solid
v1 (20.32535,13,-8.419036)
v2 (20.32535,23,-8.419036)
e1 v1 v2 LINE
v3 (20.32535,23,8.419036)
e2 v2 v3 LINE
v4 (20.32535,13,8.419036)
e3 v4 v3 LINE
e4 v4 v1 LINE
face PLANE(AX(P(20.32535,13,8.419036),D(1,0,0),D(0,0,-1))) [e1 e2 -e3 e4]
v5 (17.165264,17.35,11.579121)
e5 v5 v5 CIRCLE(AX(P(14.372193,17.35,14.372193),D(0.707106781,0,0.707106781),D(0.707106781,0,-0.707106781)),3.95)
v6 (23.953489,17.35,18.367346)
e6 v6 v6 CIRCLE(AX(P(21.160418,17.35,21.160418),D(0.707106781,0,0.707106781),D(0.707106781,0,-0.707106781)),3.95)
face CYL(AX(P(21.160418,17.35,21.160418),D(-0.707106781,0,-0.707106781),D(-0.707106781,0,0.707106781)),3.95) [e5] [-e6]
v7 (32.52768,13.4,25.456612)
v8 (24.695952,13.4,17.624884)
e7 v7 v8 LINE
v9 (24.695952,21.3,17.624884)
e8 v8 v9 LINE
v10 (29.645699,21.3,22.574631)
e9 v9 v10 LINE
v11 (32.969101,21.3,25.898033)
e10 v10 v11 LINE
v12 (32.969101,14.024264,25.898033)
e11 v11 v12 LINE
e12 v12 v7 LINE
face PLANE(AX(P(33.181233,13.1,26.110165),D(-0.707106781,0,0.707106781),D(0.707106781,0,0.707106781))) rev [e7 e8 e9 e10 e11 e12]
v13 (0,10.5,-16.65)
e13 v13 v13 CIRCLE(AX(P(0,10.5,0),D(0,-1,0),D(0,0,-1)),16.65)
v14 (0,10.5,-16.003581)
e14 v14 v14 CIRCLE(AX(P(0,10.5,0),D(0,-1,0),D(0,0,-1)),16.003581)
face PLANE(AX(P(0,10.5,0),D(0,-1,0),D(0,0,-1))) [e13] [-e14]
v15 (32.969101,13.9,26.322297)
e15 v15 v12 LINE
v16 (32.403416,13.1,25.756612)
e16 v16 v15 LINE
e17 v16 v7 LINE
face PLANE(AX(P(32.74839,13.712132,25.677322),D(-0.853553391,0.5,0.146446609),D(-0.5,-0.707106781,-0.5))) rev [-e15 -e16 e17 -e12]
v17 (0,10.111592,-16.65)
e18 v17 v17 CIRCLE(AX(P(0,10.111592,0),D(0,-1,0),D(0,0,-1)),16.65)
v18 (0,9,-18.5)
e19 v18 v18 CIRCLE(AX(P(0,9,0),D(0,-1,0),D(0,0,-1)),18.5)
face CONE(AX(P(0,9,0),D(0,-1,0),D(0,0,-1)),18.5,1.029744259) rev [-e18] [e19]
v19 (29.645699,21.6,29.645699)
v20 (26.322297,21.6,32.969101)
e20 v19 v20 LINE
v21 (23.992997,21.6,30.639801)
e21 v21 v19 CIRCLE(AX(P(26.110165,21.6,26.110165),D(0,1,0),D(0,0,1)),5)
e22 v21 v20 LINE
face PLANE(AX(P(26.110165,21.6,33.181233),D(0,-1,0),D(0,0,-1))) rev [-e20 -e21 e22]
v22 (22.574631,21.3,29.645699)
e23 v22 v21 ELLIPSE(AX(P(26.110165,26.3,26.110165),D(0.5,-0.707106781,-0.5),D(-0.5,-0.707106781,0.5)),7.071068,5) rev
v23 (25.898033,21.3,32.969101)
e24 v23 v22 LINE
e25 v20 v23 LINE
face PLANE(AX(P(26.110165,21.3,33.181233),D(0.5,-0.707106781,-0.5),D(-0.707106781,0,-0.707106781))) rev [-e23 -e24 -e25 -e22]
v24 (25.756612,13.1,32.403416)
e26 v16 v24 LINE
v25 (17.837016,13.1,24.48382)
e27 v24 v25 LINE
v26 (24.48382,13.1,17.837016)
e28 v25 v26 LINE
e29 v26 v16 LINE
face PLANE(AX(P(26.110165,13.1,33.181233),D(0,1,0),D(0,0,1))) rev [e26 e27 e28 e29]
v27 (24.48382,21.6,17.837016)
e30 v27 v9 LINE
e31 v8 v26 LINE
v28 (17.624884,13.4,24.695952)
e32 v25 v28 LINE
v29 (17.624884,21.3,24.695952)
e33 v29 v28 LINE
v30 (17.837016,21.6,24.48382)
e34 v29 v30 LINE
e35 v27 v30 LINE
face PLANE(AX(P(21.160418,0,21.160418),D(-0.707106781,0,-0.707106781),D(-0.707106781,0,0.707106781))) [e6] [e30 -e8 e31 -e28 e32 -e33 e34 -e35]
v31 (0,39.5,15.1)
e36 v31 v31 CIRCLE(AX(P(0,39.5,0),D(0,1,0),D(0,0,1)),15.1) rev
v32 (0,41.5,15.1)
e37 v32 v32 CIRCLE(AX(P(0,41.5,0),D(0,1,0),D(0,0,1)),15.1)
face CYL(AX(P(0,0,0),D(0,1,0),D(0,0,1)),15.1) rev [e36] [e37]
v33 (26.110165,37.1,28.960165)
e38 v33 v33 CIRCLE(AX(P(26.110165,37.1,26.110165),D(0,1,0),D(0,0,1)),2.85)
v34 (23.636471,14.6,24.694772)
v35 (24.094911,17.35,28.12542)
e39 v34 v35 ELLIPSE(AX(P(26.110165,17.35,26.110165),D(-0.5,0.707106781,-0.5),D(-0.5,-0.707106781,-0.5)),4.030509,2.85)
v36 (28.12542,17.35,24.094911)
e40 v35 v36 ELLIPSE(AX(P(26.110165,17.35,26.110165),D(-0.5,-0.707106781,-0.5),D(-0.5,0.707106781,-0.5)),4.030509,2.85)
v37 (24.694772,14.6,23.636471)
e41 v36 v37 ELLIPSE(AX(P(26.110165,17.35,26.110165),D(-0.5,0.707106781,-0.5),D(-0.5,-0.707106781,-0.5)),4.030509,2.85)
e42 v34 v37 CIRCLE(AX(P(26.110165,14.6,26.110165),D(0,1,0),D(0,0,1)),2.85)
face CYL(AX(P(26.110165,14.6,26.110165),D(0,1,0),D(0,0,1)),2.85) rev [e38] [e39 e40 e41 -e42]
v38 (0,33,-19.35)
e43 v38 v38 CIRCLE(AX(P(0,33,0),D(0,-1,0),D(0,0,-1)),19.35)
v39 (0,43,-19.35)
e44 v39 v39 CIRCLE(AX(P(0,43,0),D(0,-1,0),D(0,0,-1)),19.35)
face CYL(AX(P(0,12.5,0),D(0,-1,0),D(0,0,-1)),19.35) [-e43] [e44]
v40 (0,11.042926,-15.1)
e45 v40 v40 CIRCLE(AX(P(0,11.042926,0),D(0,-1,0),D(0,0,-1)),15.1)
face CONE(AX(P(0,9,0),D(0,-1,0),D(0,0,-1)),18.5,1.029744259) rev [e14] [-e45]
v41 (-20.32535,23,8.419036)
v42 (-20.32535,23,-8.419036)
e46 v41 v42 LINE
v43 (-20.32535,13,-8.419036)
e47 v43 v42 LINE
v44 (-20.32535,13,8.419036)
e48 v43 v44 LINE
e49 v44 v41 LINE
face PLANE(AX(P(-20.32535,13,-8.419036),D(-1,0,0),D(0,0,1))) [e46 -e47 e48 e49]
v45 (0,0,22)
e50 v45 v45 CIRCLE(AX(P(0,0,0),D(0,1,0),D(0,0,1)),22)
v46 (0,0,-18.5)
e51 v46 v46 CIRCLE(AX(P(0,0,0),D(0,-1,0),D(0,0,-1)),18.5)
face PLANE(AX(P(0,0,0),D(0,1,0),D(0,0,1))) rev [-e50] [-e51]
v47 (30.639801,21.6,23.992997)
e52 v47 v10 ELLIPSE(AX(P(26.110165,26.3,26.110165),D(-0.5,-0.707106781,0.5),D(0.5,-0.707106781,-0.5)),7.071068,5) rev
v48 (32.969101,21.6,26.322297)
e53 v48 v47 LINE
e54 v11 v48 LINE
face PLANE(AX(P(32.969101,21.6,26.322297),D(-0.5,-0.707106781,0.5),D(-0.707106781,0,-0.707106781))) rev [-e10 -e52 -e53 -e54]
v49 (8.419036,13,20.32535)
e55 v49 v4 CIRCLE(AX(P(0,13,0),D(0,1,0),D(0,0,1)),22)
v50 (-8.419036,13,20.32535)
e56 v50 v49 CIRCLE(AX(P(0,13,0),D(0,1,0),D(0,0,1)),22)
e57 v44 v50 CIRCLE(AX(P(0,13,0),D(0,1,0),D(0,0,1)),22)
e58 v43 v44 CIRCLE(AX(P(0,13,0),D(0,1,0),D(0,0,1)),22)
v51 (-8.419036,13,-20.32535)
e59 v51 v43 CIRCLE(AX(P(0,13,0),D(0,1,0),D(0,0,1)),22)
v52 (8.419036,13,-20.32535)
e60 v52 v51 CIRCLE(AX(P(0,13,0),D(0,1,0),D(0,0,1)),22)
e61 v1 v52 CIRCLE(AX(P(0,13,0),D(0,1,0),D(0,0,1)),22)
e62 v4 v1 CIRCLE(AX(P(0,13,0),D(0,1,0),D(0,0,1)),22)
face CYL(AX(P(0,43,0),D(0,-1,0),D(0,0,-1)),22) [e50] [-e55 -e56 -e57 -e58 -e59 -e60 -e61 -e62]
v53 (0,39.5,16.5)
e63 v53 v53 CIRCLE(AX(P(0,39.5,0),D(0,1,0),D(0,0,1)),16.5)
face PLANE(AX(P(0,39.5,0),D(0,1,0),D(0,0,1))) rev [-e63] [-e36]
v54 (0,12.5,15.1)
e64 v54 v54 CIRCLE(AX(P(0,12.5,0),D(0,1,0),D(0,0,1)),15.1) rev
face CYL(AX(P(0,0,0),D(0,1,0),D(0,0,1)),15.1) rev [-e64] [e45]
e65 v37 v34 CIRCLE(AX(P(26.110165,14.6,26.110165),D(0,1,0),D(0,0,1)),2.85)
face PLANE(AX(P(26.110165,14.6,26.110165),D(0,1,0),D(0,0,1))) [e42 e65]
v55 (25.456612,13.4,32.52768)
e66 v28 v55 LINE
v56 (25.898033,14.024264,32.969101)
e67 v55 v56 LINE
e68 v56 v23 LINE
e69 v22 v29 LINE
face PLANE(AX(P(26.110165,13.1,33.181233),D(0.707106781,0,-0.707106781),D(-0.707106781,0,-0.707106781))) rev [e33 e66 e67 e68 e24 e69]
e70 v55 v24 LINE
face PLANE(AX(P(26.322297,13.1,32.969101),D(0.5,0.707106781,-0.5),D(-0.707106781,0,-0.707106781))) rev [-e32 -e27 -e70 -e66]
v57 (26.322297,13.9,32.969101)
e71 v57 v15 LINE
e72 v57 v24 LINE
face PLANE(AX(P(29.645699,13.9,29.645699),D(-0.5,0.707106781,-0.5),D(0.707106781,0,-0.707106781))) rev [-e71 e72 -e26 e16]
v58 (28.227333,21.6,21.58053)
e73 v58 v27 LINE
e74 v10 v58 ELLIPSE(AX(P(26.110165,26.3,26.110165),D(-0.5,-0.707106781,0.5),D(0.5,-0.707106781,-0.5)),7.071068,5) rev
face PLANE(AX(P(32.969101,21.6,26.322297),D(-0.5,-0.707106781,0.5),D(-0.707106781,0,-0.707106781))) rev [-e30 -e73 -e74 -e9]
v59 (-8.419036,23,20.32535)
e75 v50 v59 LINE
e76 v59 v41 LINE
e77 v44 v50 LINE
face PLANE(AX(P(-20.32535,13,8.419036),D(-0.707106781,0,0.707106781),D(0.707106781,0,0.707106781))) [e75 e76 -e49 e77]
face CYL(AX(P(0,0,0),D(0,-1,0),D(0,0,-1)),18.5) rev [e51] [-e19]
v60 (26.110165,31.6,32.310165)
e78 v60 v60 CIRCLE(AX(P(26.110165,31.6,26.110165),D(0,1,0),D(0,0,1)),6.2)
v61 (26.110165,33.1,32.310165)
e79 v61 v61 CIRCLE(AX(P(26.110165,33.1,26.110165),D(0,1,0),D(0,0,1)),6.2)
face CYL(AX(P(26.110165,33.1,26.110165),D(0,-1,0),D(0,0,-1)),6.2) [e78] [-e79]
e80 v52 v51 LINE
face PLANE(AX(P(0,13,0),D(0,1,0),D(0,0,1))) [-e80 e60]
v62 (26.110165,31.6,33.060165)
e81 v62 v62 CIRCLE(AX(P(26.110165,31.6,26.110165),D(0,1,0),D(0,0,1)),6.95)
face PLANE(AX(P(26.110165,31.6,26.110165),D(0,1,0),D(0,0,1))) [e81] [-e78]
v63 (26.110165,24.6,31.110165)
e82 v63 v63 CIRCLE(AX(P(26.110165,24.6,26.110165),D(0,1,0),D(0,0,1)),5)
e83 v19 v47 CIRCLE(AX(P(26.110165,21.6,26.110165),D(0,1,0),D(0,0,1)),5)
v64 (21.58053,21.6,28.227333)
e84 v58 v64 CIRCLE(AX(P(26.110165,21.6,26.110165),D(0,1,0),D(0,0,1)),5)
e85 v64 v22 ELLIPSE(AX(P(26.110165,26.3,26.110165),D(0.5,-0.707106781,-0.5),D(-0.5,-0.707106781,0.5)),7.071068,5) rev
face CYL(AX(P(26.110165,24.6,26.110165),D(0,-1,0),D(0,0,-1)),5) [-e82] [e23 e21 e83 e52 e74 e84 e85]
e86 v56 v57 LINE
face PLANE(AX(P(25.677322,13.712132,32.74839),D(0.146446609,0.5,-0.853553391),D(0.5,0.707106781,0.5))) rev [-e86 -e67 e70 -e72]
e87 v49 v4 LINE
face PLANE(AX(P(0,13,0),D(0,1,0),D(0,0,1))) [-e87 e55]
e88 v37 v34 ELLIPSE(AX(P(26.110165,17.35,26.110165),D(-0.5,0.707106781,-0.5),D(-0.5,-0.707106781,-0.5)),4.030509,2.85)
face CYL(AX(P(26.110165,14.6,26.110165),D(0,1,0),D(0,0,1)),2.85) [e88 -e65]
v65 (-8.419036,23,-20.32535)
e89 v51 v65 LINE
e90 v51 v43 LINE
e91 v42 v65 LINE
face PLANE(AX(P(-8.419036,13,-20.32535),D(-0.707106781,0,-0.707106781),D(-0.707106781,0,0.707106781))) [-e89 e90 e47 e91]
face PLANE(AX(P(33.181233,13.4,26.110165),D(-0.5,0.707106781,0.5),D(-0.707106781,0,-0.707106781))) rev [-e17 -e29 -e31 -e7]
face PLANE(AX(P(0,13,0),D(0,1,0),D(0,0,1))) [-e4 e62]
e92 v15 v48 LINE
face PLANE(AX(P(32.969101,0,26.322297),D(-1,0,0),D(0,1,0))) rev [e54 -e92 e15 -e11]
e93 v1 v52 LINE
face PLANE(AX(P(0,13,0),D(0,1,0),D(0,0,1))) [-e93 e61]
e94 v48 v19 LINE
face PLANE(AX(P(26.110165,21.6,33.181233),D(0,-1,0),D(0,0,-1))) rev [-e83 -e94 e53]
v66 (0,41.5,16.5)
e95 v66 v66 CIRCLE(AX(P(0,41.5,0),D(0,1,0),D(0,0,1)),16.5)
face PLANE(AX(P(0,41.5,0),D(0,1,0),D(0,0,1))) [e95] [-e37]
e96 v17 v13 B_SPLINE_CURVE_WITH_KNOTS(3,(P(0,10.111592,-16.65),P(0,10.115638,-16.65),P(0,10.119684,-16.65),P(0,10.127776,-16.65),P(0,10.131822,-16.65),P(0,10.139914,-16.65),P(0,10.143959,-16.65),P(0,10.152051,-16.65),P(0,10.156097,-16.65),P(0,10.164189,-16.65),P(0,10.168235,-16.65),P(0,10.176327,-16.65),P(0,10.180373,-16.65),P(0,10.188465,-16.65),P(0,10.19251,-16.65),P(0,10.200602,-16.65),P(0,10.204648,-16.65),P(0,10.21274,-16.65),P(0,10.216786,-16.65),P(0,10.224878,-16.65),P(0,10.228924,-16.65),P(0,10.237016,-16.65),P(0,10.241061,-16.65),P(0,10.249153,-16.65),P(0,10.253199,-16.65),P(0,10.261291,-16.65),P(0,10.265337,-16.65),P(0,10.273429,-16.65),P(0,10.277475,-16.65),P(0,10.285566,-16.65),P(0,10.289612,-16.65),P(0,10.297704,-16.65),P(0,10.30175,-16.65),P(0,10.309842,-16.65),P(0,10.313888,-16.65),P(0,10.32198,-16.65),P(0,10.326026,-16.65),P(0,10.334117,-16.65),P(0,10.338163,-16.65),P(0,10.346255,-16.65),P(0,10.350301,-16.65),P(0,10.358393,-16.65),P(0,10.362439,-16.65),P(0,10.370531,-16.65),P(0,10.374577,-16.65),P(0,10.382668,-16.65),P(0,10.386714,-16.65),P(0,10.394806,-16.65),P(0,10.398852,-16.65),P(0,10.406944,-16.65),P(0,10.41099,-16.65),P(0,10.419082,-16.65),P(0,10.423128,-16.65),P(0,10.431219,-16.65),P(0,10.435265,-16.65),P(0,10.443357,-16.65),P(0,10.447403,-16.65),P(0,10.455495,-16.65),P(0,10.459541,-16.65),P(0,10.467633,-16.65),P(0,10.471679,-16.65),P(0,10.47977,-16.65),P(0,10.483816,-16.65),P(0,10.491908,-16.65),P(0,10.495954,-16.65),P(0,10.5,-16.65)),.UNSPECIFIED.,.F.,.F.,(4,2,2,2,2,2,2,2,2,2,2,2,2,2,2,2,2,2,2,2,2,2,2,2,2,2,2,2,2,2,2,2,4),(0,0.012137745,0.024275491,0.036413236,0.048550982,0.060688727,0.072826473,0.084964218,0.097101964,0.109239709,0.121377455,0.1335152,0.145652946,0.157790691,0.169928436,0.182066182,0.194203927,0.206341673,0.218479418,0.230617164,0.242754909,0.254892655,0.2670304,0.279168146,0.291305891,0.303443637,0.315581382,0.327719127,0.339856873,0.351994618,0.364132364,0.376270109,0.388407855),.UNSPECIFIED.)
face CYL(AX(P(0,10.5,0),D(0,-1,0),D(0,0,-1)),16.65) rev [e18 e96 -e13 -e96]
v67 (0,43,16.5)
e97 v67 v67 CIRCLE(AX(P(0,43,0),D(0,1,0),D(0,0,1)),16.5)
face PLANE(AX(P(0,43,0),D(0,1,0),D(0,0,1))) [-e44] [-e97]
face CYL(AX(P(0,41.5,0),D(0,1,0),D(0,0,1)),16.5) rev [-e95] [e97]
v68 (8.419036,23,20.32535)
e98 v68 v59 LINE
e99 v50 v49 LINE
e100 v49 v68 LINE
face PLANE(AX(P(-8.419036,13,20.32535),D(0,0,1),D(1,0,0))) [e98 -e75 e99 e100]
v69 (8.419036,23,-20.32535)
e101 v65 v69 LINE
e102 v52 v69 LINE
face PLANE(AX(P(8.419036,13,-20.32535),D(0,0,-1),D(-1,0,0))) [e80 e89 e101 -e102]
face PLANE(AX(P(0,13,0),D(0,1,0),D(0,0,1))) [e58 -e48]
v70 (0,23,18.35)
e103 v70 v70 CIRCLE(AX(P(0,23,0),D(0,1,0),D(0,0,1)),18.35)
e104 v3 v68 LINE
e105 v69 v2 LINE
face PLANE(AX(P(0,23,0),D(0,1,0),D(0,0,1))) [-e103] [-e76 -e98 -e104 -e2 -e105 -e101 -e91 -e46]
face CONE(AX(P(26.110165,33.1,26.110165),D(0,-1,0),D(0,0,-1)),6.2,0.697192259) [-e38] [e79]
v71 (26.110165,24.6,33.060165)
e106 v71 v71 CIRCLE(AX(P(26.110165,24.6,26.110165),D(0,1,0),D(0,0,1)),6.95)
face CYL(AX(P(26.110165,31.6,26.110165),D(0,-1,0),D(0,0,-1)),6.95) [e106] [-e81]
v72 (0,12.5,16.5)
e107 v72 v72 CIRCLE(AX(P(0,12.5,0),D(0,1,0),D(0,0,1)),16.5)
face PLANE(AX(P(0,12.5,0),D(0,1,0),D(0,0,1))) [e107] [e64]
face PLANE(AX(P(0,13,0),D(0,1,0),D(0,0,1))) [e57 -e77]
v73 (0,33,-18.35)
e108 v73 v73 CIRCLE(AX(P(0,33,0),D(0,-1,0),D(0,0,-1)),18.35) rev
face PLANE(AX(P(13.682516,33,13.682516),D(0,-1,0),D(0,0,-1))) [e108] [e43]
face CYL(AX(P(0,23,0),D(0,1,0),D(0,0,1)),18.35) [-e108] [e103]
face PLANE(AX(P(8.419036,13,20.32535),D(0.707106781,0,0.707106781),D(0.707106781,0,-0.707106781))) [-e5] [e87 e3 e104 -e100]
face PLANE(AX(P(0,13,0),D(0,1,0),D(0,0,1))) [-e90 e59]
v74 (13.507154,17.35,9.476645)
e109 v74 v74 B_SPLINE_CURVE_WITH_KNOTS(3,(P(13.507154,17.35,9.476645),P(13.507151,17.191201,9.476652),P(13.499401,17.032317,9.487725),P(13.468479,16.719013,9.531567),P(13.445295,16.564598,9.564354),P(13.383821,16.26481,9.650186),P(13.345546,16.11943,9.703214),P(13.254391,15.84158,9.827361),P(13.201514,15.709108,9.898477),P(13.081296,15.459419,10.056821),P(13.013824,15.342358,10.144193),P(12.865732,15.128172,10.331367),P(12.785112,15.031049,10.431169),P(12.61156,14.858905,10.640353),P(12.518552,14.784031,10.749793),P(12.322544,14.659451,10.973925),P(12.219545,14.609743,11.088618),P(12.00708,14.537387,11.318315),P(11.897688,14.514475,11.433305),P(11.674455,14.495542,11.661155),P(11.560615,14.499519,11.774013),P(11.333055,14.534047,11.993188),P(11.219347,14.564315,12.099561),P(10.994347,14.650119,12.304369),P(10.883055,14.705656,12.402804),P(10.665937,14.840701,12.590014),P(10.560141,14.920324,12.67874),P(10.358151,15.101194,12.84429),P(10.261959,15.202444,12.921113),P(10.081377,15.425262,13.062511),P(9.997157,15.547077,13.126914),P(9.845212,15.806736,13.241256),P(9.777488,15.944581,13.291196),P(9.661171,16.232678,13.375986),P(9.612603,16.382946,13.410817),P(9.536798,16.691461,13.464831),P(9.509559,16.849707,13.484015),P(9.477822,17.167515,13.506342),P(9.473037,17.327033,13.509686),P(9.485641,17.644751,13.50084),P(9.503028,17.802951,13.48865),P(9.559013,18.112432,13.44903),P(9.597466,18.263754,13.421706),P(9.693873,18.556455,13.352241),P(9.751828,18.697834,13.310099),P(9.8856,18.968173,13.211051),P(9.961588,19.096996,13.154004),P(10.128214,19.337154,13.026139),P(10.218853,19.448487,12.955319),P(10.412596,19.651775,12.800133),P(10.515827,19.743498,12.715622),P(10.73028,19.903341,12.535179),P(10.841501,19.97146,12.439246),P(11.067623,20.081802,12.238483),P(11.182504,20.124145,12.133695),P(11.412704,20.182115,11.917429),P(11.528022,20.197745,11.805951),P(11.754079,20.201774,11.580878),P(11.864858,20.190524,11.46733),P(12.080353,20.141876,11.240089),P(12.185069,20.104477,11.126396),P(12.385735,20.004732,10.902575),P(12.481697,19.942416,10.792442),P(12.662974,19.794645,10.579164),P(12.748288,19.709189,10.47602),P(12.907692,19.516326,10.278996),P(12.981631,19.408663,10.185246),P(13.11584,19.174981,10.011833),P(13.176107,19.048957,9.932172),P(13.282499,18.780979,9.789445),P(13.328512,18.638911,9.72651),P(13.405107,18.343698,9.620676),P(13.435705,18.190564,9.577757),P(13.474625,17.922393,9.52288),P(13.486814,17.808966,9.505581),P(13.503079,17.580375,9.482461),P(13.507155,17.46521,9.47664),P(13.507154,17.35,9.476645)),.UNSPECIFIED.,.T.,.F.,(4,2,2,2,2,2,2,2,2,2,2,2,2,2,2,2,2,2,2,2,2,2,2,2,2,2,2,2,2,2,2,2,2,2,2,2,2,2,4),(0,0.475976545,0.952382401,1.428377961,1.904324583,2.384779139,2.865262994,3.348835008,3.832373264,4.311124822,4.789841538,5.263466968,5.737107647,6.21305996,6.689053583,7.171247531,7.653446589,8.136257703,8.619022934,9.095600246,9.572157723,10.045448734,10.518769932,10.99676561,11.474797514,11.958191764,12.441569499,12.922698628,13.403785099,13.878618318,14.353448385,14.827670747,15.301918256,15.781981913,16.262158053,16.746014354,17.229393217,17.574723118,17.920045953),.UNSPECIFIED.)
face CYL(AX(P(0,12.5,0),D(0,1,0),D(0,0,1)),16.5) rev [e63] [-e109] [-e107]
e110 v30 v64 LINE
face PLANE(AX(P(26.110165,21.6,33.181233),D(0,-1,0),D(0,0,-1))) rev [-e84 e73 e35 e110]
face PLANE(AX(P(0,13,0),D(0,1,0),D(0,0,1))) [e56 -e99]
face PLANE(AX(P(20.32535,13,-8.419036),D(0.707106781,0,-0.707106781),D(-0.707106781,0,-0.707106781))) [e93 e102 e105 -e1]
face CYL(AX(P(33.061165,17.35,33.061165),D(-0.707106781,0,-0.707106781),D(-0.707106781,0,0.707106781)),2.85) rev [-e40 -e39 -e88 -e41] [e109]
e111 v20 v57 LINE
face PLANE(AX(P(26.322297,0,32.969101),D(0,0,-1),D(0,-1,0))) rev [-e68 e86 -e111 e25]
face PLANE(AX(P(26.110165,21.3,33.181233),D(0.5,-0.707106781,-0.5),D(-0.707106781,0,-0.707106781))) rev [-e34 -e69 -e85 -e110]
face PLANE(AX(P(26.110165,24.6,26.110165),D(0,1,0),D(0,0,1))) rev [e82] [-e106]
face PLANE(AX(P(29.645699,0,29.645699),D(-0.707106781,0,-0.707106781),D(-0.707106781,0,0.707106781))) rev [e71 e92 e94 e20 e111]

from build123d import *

# Parameters (mm, degrees)
SKETCH_1_R                = 22
EXTRUDE_1_DEPTH           = 43
SKETCH_3_OUTSIDE_W        = 61.128
SKETCH_3_OUTSIDE_H        = 61.128
CUT_EXTRUDE_1_DEPTH       = 30
SKETCH_4_OUTSIDE_W        = 61.128
SKETCH_4_OUTSIDE_H        = 61.128
SKETCH_4_OUTSIDE_R        = 18.35
CUT_EXTRUDE_2_DEPTH       = 20
SKETCH_5_R                = 16.5
CUT_EXTRUDE_3_DEPTH       = 1.5
SKETCH_6_R                = 15.1
CUT_EXTRUDE_4_DEPTH       = 54.075418039
SKETCH_7_R                = 16.5
CUT_EXTRUDE_5_DEPTH       = 27
SKETCH_8_R                = 16.65
CUT_EXTRUDE_6_DEPTH       = 10.5
M39X2_02_D                = 37
M39X2_02_DEPTH            = 9
M39X2_02_TIP              = 11.115921452
SKETCH_14_R               = 3.95
EXTRUDE_2_DEPTH           = 9.6
SKETCH_15_W               = 10
SKETCH_15_H               = 8.5
EXTRUDE_3_DEPTH           = 12
CHAMFER_1_SIZE            = 0.8
CHAMFER_2_SIZE            = 0.3
SKETCH_18_R               = 5
EXTRUDE_4_DEPTH           = 3
CHAMFER_3_SIZE            = 0.3
SKETCH_19_R               = 6.95
EXTRUDE_5_DEPTH           = 7
SKETCH_21_R               = 6.2
EXTRUDE_6_DEPTH           = 1.5
SKETCH_24_R               = 2.85
CUT_EXTRUDE_7_DEPTH       = 22.5
CUT_EXTRUDE_11_REACH      = 69.044
CUT_EXTRUDE_11_END_RADIUS = 2.85
SKETCH_25_R               = 2.85
CUT_EXTRUDE_12_REACH      = 69.044
SKETCH_26_R               = 2.85
SKETCH_27_W               = 1
SKETCH_27_H               = 10


with BuildPart() as part:
    # Эскиз1 → Бобышка-Вытянуть1 (new body)
    with BuildSketch(Plane(origin=(0, 0, 0), x_dir=(1, 0, 0), z_dir=(0, 1, 0))):
        with Locations(Location((0, 0, 0), (0, 0, 270))):
            Circle(SKETCH_1_R)
    extrude(amount=EXTRUDE_1_DEPTH)

    # Эскиз3 outside → Вырез-Вытянуть1 (cut)
    with BuildSketch(Plane(origin=(0, 43, 0), x_dir=(1, 0, 0), z_dir=(0, 1, 0))):
        Rectangle(SKETCH_3_OUTSIDE_W, SKETCH_3_OUTSIDE_H)
        Polygon((20.325349715, -8.419035512), (20.325349715, 8.419035512), (8.419035512, 20.325349715), (-8.419035512, 20.325349715), (-20.325349715, 8.419035512), (-20.325349715, -8.419035512), (-8.419035512, -20.325349715), (8.419035512, -20.325349715), align=None, mode=Mode.SUBTRACT)
    extrude(amount=-CUT_EXTRUDE_1_DEPTH, mode=Mode.SUBTRACT)

    # Эскиз4 outside → Вырез-Вытянуть2 (cut)
    with BuildSketch(Plane(origin=(0, 43, 0), x_dir=(1, 0, 0), z_dir=(0, 1, 0))):
        Rectangle(SKETCH_4_OUTSIDE_W, SKETCH_4_OUTSIDE_H)
        with Locations(Location((0, 0, 0), (0, 0, 270))):
            Circle(SKETCH_4_OUTSIDE_R, mode=Mode.SUBTRACT)
    extrude(amount=-CUT_EXTRUDE_2_DEPTH, mode=Mode.SUBTRACT)

    # Эскиз5 → Вырез-Вытянуть3 (cut)
    with BuildSketch(Plane(origin=(0, 43, 0), x_dir=(1, 0, 0), z_dir=(0, 1, 0))):
        with Locations(Location((0, 0, 0), (0, 0, 270))):
            Circle(SKETCH_5_R)
    extrude(amount=-CUT_EXTRUDE_3_DEPTH, mode=Mode.SUBTRACT)

    # Эскиз6 → Вырез-Вытянуть4 (cut, through all)
    with BuildSketch(Plane(origin=(0, 43, 0), x_dir=(1, 0, 0), z_dir=(0, 1, 0))):
        with Locations(Location((0, 0, 0), (0, 0, 270))):
            Circle(SKETCH_6_R)
    extrude(amount=-CUT_EXTRUDE_4_DEPTH, mode=Mode.SUBTRACT)

    # Эскиз7 → Вырез-Вытянуть5 (cut)
    with BuildSketch(Plane(origin=(0, 39.5, 0), x_dir=(1, 0, 0), z_dir=(0, 1, 0))):
        with Locations(Location((0, 0, 0), (0, 0, 270))):
            Circle(SKETCH_7_R)
    extrude(amount=-CUT_EXTRUDE_5_DEPTH, mode=Mode.SUBTRACT)

    # Эскиз8 → Вырез-Вытянуть6 (cut)
    with BuildSketch(Plane.XZ):
        with Locations(Location((0, 0, 0), (0, 0, 270))):
            Circle(SKETCH_8_R)
    extrude(amount=-CUT_EXTRUDE_6_DEPTH, mode=Mode.SUBTRACT)

    # Отверстие обработанное метчиком M39x2.02
    with Locations(Plane(origin=(0, 0, 0), x_dir=(-1, 0, 0), z_dir=(0, -1, 0))):
        with Locations((0, 0)):
            Hole(M39X2_02_D / 2, depth=M39X2_02_DEPTH)
            with Locations((0, 0, -(M39X2_02_DEPTH + M39X2_02_TIP / 2))):  # 118° drill point
                Cone(0, M39X2_02_D / 2, M39X2_02_TIP, mode=Mode.SUBTRACT)

    # Эскиз14 → Бобышка-Вытянуть2 (add)
    with BuildSketch(Plane(origin=(14.372192614, 0, 14.372192614), x_dir=(0.7071067811865475, 0, -0.7071067811865476), z_dir=(0.7071067811865476, 0, 0.7071067811865475))):
        with Locations((0, 17.35)):
            Circle(SKETCH_14_R)
    extrude(amount=EXTRUDE_2_DEPTH)

    # Эскиз15 → Бобышка-Вытянуть3 (add)
    with BuildSketch(Plane(origin=(21.160417713, 0, 21.160417713), x_dir=(0.7071067811865475, 0, -0.7071067811865476), z_dir=(0.7071067811865476, 0, 0.7071067811865475))):
        with Locations((0, 17.35)):
            Rectangle(SKETCH_15_W, SKETCH_15_H)
    extrude(amount=EXTRUDE_3_DEPTH)

    # Фаска1
    chamfer_1_edges = [part.edges().sort_by_distance(p)[0] for p in [
        (29.645699087, 13.1, 29.645699087),
    ]]
    chamfer(chamfer_1_edges, length=CHAMFER_1_SIZE)

    # Фаска2
    chamfer_2_edges = [part.edges().sort_by_distance(p)[0] for p in [
        (26.110165181, 17.75, 33.181232993),
        (33.181232993, 17.75, 26.110165181),
        (28.655749594, 13.1, 21.584681782),
        (32.898390281, 13.5, 25.827322469),
        (21.584681782, 13.1, 28.655749594),
        (25.827322469, 13.5, 32.898390281),
    ]]
    chamfer(chamfer_2_edges, length=CHAMFER_2_SIZE)

    # Эскиз18 → Бобышка-Вытянуть4 (add)
    with BuildSketch(Plane(origin=(0, 21.6, 0), x_dir=(1, 0, 0), z_dir=(0, 1, 0))):
        with Locations(Location((26.110165181, -26.110165181, 0), (0, 0, 45))):
            Circle(SKETCH_18_R)
    extrude(amount=EXTRUDE_4_DEPTH)

    # Фаска3
    # the kernel refuses this chamfer: 0.3 mm, written as the material it takes off along each edge
    with BuildSketch(Plane(origin=(24.150415275, 21.6, 17.079347463), x_dir=(0.01944252080601493, -0.9996219169112965, -0.019442520806014937), z_dir=(0.7071067811865476, 0, 0.7071067811865475))) as chamfer_3_piece_1_section:
        Polygon((CHAMFER_3_SIZE * 0.999621916911, -CHAMFER_3_SIZE * 0.0274958766106), (-CHAMFER_3_SIZE * 0.0274958766106, -CHAMFER_3_SIZE * 0.999621916911), (0, 0), align=None)
    chamfer_3_piece_1 = extrude(amount=7.771504896, mode=Mode.PRIVATE)
    chamfer_3_piece_1 = chamfer_3_piece_1 - Plane(origin=(26.110165181, 21.497863029, 26.110165181), x_dir=(0.7071067811865476, 0, -0.7071067811865475), z_dir=(0, -1, 0)) * Cylinder(5, 17, mode=Mode.PRIVATE)
    add(chamfer_3_piece_1, mode=Mode.SUBTRACT)
    with BuildSketch(Plane(origin=(29.645699087, 21.6, 22.574631275), x_dir=(0.01944252080600918, -0.999621916911297, -0.019442520806009188), z_dir=(0.7071067811865476, 0, 0.7071067811865475))) as chamfer_3_piece_2_section:
        Polygon((CHAMFER_3_SIZE * 0.999621916911, -CHAMFER_3_SIZE * 0.0274958766106), (-CHAMFER_3_SIZE * 0.0274958766106, -CHAMFER_3_SIZE * 0.999621916911), (0, 0), align=None)
    chamfer_3_piece_2 = extrude(amount=5.471504896, mode=Mode.PRIVATE)
    chamfer_3_piece_2 = chamfer_3_piece_2 - Plane(origin=(26.110165181, 21.497295997, 26.110165181), x_dir=(0.7071067811865476, 0, -0.7071067811865475), z_dir=(0, -1, 0)) * Cylinder(5, 13, mode=Mode.PRIVATE)
    add(chamfer_3_piece_2, mode=Mode.SUBTRACT)
    with BuildSketch(Plane(origin=(17.079347463, 21.6, 24.150415275), x_dir=(-0.01944252080601493, -0.9996219169112965, 0.019442520806014937), z_dir=(0.7071067811865476, 0, 0.7071067811865475))) as chamfer_3_piece_3_section:
        Polygon((CHAMFER_3_SIZE * 0.999621916911, CHAMFER_3_SIZE * 0.0274958766106), (-CHAMFER_3_SIZE * 0.0274958766106, CHAMFER_3_SIZE * 0.999621916911), (0, 0), align=None)
    chamfer_3_piece_3 = extrude(amount=7.771504896, mode=Mode.PRIVATE)
    chamfer_3_piece_3 = chamfer_3_piece_3 - Plane(origin=(26.110165181, 21.497863029, 26.110165181), x_dir=(0.7071067811865476, 0, -0.7071067811865475), z_dir=(0, -1, 0)) * Cylinder(5, 17, mode=Mode.PRIVATE)
    add(chamfer_3_piece_3, mode=Mode.SUBTRACT)
    with BuildSketch(Plane(origin=(22.574631275, 21.6, 29.645699087), x_dir=(-0.01944252080602069, -0.9996219169112965, 0.01944252080602069), z_dir=(0.7071067811865476, 0, 0.7071067811865475))) as chamfer_3_piece_4_section:
        Polygon((CHAMFER_3_SIZE * 0.999621916911, CHAMFER_3_SIZE * 0.0274958766106), (-CHAMFER_3_SIZE * 0.0274958766106, CHAMFER_3_SIZE * 0.999621916911), (0, 0), align=None)
    chamfer_3_piece_4 = extrude(amount=5.471504896, mode=Mode.PRIVATE)
    chamfer_3_piece_4 = chamfer_3_piece_4 - Plane(origin=(26.110165181, 21.497295996, 26.110165181), x_dir=(0.7071067811865476, 0, -0.7071067811865475), z_dir=(0, -1, 0)) * Cylinder(5, 13, mode=Mode.PRIVATE)
    add(chamfer_3_piece_4, mode=Mode.SUBTRACT)

    # Эскиз19 → Бобышка-Вытянуть5 (add)
    with BuildSketch(Plane(origin=(0, 24.6, 0), x_dir=(1, 0, 0), z_dir=(0, 1, 0))):
        with Locations(Location((26.110165181, -26.110165181, 0), (0, 0, 270))):
            Circle(SKETCH_19_R)
    extrude(amount=EXTRUDE_5_DEPTH)

    # Эскиз21 → Бобышка-Вытянуть6 (add)
    with BuildSketch(Plane(origin=(0, 31.6, 0), x_dir=(1, 0, 0), z_dir=(0, 1, 0))):
        with Locations(Location((26.110165181, -26.110165181, 0), (0, 0, 270))):
            Circle(SKETCH_21_R)
    extrude(amount=EXTRUDE_6_DEPTH)

    # Эскиз22 → Повернуть1 (revolve)
    with BuildSketch(Plane(origin=(0, 0, 0), x_dir=(0.7071067811865477, 0, 0.7071067811865475), z_dir=(-0.7071067811865475, 0, 0.7071067811865477)), mode=Mode.PRIVATE) as revolve_1_sk:
        Polygon((36.925349715, 33.1), (36.925349715, 37.1), (39.775349715, 37.1), (43.125349715, 33.1), align=None)
    revolve(revolve_1_sk.sketch.rotate(Axis((26.110165181, -966.9, 26.110165181), (0, 1, 0)), 109.948443589), axis=Axis((26.110165181, -966.9, 26.110165181), (0, 1, 0)))

    # Эскиз24 → Вырез-Вытянуть7 (cut)
    with BuildSketch(Plane(origin=(0, 37.1, 0), x_dir=(1, 0, 0), z_dir=(0, 1, 0))):
        with Locations(Location((26.110165181, -26.110165181, 0), (0, 0, 270))):
            Circle(SKETCH_24_R)
    extrude(amount=-CUT_EXTRUDE_7_DEPTH, mode=Mode.SUBTRACT)

    # Вырез-Вытянуть11: up to this cylinder (the profile starts outside it)
    cut_extrude_11_end = Plane(origin=(26.110165181, 17.35, 26.110165181), z_dir=(0, 1, 0)) * Cylinder(CUT_EXTRUDE_11_END_RADIUS, 144.788, mode=Mode.PRIVATE)
    # Эскиз25 → Вырез-Вытянуть11 (cut, up to the surface)
    with BuildSketch(Plane(origin=(14.372192614, 0, 14.372192614), x_dir=(0.7071067811865475, 0, -0.7071067811865476), z_dir=(0.7071067811865476, 0, 0.7071067811865475)), mode=Mode.PRIVATE) as cut_extrude_11_sk1:
        with Locations((0, 17.35)):
            Circle(SKETCH_25_R)
    cut_extrude_11_tool1 = extrude(cut_extrude_11_sk1.sketch, amount=CUT_EXTRUDE_11_REACH, mode=Mode.PRIVATE) - cut_extrude_11_end
    add(cut_extrude_11_tool1.solids().sort_by_distance((14.372193, 17.35, 14.372193))[0], mode=Mode.SUBTRACT)

    # Эскиз26 → Вырез-Вытянуть12 (cut, up to next)
    with BuildSketch(Plane(origin=(14.372192614, 0, 14.372192614), x_dir=(0.7071067811865475, 0, -0.7071067811865476), z_dir=(0.7071067811865476, 0, 0.7071067811865475)), mode=Mode.PRIVATE) as cut_extrude_12_sk1:
        with Locations((0, 17.35)):
            Circle(SKETCH_26_R)
    cut_extrude_12_tool1 = extrude(cut_extrude_12_sk1.sketch, amount=-CUT_EXTRUDE_12_REACH, mode=Mode.PRIVATE) & part.part
    add(cut_extrude_12_tool1.solids().sort_by_distance((14.372193, 17.35, 14.372193))[0], mode=Mode.SUBTRACT)

    # Эскиз27 → Повернуть2 (revolve)
    with BuildSketch(Plane(origin=(0, 0, 0), x_dir=(0.7071067811865477, 0, 0.7071067811865475), z_dir=(-0.7071067811865475, 0, 0.7071067811865477)), mode=Mode.PRIVATE) as revolve_2_sk:
        with Locations((18.85, 38)):
            Rectangle(SKETCH_27_W, SKETCH_27_H)
    revolve(revolve_2_sk.sketch.rotate(Axis((0, 12.5, 0), (0, 1, 0)), 135), axis=Axis((0, 12.5, 0), (0, 1, 0)))


solid = part.part
